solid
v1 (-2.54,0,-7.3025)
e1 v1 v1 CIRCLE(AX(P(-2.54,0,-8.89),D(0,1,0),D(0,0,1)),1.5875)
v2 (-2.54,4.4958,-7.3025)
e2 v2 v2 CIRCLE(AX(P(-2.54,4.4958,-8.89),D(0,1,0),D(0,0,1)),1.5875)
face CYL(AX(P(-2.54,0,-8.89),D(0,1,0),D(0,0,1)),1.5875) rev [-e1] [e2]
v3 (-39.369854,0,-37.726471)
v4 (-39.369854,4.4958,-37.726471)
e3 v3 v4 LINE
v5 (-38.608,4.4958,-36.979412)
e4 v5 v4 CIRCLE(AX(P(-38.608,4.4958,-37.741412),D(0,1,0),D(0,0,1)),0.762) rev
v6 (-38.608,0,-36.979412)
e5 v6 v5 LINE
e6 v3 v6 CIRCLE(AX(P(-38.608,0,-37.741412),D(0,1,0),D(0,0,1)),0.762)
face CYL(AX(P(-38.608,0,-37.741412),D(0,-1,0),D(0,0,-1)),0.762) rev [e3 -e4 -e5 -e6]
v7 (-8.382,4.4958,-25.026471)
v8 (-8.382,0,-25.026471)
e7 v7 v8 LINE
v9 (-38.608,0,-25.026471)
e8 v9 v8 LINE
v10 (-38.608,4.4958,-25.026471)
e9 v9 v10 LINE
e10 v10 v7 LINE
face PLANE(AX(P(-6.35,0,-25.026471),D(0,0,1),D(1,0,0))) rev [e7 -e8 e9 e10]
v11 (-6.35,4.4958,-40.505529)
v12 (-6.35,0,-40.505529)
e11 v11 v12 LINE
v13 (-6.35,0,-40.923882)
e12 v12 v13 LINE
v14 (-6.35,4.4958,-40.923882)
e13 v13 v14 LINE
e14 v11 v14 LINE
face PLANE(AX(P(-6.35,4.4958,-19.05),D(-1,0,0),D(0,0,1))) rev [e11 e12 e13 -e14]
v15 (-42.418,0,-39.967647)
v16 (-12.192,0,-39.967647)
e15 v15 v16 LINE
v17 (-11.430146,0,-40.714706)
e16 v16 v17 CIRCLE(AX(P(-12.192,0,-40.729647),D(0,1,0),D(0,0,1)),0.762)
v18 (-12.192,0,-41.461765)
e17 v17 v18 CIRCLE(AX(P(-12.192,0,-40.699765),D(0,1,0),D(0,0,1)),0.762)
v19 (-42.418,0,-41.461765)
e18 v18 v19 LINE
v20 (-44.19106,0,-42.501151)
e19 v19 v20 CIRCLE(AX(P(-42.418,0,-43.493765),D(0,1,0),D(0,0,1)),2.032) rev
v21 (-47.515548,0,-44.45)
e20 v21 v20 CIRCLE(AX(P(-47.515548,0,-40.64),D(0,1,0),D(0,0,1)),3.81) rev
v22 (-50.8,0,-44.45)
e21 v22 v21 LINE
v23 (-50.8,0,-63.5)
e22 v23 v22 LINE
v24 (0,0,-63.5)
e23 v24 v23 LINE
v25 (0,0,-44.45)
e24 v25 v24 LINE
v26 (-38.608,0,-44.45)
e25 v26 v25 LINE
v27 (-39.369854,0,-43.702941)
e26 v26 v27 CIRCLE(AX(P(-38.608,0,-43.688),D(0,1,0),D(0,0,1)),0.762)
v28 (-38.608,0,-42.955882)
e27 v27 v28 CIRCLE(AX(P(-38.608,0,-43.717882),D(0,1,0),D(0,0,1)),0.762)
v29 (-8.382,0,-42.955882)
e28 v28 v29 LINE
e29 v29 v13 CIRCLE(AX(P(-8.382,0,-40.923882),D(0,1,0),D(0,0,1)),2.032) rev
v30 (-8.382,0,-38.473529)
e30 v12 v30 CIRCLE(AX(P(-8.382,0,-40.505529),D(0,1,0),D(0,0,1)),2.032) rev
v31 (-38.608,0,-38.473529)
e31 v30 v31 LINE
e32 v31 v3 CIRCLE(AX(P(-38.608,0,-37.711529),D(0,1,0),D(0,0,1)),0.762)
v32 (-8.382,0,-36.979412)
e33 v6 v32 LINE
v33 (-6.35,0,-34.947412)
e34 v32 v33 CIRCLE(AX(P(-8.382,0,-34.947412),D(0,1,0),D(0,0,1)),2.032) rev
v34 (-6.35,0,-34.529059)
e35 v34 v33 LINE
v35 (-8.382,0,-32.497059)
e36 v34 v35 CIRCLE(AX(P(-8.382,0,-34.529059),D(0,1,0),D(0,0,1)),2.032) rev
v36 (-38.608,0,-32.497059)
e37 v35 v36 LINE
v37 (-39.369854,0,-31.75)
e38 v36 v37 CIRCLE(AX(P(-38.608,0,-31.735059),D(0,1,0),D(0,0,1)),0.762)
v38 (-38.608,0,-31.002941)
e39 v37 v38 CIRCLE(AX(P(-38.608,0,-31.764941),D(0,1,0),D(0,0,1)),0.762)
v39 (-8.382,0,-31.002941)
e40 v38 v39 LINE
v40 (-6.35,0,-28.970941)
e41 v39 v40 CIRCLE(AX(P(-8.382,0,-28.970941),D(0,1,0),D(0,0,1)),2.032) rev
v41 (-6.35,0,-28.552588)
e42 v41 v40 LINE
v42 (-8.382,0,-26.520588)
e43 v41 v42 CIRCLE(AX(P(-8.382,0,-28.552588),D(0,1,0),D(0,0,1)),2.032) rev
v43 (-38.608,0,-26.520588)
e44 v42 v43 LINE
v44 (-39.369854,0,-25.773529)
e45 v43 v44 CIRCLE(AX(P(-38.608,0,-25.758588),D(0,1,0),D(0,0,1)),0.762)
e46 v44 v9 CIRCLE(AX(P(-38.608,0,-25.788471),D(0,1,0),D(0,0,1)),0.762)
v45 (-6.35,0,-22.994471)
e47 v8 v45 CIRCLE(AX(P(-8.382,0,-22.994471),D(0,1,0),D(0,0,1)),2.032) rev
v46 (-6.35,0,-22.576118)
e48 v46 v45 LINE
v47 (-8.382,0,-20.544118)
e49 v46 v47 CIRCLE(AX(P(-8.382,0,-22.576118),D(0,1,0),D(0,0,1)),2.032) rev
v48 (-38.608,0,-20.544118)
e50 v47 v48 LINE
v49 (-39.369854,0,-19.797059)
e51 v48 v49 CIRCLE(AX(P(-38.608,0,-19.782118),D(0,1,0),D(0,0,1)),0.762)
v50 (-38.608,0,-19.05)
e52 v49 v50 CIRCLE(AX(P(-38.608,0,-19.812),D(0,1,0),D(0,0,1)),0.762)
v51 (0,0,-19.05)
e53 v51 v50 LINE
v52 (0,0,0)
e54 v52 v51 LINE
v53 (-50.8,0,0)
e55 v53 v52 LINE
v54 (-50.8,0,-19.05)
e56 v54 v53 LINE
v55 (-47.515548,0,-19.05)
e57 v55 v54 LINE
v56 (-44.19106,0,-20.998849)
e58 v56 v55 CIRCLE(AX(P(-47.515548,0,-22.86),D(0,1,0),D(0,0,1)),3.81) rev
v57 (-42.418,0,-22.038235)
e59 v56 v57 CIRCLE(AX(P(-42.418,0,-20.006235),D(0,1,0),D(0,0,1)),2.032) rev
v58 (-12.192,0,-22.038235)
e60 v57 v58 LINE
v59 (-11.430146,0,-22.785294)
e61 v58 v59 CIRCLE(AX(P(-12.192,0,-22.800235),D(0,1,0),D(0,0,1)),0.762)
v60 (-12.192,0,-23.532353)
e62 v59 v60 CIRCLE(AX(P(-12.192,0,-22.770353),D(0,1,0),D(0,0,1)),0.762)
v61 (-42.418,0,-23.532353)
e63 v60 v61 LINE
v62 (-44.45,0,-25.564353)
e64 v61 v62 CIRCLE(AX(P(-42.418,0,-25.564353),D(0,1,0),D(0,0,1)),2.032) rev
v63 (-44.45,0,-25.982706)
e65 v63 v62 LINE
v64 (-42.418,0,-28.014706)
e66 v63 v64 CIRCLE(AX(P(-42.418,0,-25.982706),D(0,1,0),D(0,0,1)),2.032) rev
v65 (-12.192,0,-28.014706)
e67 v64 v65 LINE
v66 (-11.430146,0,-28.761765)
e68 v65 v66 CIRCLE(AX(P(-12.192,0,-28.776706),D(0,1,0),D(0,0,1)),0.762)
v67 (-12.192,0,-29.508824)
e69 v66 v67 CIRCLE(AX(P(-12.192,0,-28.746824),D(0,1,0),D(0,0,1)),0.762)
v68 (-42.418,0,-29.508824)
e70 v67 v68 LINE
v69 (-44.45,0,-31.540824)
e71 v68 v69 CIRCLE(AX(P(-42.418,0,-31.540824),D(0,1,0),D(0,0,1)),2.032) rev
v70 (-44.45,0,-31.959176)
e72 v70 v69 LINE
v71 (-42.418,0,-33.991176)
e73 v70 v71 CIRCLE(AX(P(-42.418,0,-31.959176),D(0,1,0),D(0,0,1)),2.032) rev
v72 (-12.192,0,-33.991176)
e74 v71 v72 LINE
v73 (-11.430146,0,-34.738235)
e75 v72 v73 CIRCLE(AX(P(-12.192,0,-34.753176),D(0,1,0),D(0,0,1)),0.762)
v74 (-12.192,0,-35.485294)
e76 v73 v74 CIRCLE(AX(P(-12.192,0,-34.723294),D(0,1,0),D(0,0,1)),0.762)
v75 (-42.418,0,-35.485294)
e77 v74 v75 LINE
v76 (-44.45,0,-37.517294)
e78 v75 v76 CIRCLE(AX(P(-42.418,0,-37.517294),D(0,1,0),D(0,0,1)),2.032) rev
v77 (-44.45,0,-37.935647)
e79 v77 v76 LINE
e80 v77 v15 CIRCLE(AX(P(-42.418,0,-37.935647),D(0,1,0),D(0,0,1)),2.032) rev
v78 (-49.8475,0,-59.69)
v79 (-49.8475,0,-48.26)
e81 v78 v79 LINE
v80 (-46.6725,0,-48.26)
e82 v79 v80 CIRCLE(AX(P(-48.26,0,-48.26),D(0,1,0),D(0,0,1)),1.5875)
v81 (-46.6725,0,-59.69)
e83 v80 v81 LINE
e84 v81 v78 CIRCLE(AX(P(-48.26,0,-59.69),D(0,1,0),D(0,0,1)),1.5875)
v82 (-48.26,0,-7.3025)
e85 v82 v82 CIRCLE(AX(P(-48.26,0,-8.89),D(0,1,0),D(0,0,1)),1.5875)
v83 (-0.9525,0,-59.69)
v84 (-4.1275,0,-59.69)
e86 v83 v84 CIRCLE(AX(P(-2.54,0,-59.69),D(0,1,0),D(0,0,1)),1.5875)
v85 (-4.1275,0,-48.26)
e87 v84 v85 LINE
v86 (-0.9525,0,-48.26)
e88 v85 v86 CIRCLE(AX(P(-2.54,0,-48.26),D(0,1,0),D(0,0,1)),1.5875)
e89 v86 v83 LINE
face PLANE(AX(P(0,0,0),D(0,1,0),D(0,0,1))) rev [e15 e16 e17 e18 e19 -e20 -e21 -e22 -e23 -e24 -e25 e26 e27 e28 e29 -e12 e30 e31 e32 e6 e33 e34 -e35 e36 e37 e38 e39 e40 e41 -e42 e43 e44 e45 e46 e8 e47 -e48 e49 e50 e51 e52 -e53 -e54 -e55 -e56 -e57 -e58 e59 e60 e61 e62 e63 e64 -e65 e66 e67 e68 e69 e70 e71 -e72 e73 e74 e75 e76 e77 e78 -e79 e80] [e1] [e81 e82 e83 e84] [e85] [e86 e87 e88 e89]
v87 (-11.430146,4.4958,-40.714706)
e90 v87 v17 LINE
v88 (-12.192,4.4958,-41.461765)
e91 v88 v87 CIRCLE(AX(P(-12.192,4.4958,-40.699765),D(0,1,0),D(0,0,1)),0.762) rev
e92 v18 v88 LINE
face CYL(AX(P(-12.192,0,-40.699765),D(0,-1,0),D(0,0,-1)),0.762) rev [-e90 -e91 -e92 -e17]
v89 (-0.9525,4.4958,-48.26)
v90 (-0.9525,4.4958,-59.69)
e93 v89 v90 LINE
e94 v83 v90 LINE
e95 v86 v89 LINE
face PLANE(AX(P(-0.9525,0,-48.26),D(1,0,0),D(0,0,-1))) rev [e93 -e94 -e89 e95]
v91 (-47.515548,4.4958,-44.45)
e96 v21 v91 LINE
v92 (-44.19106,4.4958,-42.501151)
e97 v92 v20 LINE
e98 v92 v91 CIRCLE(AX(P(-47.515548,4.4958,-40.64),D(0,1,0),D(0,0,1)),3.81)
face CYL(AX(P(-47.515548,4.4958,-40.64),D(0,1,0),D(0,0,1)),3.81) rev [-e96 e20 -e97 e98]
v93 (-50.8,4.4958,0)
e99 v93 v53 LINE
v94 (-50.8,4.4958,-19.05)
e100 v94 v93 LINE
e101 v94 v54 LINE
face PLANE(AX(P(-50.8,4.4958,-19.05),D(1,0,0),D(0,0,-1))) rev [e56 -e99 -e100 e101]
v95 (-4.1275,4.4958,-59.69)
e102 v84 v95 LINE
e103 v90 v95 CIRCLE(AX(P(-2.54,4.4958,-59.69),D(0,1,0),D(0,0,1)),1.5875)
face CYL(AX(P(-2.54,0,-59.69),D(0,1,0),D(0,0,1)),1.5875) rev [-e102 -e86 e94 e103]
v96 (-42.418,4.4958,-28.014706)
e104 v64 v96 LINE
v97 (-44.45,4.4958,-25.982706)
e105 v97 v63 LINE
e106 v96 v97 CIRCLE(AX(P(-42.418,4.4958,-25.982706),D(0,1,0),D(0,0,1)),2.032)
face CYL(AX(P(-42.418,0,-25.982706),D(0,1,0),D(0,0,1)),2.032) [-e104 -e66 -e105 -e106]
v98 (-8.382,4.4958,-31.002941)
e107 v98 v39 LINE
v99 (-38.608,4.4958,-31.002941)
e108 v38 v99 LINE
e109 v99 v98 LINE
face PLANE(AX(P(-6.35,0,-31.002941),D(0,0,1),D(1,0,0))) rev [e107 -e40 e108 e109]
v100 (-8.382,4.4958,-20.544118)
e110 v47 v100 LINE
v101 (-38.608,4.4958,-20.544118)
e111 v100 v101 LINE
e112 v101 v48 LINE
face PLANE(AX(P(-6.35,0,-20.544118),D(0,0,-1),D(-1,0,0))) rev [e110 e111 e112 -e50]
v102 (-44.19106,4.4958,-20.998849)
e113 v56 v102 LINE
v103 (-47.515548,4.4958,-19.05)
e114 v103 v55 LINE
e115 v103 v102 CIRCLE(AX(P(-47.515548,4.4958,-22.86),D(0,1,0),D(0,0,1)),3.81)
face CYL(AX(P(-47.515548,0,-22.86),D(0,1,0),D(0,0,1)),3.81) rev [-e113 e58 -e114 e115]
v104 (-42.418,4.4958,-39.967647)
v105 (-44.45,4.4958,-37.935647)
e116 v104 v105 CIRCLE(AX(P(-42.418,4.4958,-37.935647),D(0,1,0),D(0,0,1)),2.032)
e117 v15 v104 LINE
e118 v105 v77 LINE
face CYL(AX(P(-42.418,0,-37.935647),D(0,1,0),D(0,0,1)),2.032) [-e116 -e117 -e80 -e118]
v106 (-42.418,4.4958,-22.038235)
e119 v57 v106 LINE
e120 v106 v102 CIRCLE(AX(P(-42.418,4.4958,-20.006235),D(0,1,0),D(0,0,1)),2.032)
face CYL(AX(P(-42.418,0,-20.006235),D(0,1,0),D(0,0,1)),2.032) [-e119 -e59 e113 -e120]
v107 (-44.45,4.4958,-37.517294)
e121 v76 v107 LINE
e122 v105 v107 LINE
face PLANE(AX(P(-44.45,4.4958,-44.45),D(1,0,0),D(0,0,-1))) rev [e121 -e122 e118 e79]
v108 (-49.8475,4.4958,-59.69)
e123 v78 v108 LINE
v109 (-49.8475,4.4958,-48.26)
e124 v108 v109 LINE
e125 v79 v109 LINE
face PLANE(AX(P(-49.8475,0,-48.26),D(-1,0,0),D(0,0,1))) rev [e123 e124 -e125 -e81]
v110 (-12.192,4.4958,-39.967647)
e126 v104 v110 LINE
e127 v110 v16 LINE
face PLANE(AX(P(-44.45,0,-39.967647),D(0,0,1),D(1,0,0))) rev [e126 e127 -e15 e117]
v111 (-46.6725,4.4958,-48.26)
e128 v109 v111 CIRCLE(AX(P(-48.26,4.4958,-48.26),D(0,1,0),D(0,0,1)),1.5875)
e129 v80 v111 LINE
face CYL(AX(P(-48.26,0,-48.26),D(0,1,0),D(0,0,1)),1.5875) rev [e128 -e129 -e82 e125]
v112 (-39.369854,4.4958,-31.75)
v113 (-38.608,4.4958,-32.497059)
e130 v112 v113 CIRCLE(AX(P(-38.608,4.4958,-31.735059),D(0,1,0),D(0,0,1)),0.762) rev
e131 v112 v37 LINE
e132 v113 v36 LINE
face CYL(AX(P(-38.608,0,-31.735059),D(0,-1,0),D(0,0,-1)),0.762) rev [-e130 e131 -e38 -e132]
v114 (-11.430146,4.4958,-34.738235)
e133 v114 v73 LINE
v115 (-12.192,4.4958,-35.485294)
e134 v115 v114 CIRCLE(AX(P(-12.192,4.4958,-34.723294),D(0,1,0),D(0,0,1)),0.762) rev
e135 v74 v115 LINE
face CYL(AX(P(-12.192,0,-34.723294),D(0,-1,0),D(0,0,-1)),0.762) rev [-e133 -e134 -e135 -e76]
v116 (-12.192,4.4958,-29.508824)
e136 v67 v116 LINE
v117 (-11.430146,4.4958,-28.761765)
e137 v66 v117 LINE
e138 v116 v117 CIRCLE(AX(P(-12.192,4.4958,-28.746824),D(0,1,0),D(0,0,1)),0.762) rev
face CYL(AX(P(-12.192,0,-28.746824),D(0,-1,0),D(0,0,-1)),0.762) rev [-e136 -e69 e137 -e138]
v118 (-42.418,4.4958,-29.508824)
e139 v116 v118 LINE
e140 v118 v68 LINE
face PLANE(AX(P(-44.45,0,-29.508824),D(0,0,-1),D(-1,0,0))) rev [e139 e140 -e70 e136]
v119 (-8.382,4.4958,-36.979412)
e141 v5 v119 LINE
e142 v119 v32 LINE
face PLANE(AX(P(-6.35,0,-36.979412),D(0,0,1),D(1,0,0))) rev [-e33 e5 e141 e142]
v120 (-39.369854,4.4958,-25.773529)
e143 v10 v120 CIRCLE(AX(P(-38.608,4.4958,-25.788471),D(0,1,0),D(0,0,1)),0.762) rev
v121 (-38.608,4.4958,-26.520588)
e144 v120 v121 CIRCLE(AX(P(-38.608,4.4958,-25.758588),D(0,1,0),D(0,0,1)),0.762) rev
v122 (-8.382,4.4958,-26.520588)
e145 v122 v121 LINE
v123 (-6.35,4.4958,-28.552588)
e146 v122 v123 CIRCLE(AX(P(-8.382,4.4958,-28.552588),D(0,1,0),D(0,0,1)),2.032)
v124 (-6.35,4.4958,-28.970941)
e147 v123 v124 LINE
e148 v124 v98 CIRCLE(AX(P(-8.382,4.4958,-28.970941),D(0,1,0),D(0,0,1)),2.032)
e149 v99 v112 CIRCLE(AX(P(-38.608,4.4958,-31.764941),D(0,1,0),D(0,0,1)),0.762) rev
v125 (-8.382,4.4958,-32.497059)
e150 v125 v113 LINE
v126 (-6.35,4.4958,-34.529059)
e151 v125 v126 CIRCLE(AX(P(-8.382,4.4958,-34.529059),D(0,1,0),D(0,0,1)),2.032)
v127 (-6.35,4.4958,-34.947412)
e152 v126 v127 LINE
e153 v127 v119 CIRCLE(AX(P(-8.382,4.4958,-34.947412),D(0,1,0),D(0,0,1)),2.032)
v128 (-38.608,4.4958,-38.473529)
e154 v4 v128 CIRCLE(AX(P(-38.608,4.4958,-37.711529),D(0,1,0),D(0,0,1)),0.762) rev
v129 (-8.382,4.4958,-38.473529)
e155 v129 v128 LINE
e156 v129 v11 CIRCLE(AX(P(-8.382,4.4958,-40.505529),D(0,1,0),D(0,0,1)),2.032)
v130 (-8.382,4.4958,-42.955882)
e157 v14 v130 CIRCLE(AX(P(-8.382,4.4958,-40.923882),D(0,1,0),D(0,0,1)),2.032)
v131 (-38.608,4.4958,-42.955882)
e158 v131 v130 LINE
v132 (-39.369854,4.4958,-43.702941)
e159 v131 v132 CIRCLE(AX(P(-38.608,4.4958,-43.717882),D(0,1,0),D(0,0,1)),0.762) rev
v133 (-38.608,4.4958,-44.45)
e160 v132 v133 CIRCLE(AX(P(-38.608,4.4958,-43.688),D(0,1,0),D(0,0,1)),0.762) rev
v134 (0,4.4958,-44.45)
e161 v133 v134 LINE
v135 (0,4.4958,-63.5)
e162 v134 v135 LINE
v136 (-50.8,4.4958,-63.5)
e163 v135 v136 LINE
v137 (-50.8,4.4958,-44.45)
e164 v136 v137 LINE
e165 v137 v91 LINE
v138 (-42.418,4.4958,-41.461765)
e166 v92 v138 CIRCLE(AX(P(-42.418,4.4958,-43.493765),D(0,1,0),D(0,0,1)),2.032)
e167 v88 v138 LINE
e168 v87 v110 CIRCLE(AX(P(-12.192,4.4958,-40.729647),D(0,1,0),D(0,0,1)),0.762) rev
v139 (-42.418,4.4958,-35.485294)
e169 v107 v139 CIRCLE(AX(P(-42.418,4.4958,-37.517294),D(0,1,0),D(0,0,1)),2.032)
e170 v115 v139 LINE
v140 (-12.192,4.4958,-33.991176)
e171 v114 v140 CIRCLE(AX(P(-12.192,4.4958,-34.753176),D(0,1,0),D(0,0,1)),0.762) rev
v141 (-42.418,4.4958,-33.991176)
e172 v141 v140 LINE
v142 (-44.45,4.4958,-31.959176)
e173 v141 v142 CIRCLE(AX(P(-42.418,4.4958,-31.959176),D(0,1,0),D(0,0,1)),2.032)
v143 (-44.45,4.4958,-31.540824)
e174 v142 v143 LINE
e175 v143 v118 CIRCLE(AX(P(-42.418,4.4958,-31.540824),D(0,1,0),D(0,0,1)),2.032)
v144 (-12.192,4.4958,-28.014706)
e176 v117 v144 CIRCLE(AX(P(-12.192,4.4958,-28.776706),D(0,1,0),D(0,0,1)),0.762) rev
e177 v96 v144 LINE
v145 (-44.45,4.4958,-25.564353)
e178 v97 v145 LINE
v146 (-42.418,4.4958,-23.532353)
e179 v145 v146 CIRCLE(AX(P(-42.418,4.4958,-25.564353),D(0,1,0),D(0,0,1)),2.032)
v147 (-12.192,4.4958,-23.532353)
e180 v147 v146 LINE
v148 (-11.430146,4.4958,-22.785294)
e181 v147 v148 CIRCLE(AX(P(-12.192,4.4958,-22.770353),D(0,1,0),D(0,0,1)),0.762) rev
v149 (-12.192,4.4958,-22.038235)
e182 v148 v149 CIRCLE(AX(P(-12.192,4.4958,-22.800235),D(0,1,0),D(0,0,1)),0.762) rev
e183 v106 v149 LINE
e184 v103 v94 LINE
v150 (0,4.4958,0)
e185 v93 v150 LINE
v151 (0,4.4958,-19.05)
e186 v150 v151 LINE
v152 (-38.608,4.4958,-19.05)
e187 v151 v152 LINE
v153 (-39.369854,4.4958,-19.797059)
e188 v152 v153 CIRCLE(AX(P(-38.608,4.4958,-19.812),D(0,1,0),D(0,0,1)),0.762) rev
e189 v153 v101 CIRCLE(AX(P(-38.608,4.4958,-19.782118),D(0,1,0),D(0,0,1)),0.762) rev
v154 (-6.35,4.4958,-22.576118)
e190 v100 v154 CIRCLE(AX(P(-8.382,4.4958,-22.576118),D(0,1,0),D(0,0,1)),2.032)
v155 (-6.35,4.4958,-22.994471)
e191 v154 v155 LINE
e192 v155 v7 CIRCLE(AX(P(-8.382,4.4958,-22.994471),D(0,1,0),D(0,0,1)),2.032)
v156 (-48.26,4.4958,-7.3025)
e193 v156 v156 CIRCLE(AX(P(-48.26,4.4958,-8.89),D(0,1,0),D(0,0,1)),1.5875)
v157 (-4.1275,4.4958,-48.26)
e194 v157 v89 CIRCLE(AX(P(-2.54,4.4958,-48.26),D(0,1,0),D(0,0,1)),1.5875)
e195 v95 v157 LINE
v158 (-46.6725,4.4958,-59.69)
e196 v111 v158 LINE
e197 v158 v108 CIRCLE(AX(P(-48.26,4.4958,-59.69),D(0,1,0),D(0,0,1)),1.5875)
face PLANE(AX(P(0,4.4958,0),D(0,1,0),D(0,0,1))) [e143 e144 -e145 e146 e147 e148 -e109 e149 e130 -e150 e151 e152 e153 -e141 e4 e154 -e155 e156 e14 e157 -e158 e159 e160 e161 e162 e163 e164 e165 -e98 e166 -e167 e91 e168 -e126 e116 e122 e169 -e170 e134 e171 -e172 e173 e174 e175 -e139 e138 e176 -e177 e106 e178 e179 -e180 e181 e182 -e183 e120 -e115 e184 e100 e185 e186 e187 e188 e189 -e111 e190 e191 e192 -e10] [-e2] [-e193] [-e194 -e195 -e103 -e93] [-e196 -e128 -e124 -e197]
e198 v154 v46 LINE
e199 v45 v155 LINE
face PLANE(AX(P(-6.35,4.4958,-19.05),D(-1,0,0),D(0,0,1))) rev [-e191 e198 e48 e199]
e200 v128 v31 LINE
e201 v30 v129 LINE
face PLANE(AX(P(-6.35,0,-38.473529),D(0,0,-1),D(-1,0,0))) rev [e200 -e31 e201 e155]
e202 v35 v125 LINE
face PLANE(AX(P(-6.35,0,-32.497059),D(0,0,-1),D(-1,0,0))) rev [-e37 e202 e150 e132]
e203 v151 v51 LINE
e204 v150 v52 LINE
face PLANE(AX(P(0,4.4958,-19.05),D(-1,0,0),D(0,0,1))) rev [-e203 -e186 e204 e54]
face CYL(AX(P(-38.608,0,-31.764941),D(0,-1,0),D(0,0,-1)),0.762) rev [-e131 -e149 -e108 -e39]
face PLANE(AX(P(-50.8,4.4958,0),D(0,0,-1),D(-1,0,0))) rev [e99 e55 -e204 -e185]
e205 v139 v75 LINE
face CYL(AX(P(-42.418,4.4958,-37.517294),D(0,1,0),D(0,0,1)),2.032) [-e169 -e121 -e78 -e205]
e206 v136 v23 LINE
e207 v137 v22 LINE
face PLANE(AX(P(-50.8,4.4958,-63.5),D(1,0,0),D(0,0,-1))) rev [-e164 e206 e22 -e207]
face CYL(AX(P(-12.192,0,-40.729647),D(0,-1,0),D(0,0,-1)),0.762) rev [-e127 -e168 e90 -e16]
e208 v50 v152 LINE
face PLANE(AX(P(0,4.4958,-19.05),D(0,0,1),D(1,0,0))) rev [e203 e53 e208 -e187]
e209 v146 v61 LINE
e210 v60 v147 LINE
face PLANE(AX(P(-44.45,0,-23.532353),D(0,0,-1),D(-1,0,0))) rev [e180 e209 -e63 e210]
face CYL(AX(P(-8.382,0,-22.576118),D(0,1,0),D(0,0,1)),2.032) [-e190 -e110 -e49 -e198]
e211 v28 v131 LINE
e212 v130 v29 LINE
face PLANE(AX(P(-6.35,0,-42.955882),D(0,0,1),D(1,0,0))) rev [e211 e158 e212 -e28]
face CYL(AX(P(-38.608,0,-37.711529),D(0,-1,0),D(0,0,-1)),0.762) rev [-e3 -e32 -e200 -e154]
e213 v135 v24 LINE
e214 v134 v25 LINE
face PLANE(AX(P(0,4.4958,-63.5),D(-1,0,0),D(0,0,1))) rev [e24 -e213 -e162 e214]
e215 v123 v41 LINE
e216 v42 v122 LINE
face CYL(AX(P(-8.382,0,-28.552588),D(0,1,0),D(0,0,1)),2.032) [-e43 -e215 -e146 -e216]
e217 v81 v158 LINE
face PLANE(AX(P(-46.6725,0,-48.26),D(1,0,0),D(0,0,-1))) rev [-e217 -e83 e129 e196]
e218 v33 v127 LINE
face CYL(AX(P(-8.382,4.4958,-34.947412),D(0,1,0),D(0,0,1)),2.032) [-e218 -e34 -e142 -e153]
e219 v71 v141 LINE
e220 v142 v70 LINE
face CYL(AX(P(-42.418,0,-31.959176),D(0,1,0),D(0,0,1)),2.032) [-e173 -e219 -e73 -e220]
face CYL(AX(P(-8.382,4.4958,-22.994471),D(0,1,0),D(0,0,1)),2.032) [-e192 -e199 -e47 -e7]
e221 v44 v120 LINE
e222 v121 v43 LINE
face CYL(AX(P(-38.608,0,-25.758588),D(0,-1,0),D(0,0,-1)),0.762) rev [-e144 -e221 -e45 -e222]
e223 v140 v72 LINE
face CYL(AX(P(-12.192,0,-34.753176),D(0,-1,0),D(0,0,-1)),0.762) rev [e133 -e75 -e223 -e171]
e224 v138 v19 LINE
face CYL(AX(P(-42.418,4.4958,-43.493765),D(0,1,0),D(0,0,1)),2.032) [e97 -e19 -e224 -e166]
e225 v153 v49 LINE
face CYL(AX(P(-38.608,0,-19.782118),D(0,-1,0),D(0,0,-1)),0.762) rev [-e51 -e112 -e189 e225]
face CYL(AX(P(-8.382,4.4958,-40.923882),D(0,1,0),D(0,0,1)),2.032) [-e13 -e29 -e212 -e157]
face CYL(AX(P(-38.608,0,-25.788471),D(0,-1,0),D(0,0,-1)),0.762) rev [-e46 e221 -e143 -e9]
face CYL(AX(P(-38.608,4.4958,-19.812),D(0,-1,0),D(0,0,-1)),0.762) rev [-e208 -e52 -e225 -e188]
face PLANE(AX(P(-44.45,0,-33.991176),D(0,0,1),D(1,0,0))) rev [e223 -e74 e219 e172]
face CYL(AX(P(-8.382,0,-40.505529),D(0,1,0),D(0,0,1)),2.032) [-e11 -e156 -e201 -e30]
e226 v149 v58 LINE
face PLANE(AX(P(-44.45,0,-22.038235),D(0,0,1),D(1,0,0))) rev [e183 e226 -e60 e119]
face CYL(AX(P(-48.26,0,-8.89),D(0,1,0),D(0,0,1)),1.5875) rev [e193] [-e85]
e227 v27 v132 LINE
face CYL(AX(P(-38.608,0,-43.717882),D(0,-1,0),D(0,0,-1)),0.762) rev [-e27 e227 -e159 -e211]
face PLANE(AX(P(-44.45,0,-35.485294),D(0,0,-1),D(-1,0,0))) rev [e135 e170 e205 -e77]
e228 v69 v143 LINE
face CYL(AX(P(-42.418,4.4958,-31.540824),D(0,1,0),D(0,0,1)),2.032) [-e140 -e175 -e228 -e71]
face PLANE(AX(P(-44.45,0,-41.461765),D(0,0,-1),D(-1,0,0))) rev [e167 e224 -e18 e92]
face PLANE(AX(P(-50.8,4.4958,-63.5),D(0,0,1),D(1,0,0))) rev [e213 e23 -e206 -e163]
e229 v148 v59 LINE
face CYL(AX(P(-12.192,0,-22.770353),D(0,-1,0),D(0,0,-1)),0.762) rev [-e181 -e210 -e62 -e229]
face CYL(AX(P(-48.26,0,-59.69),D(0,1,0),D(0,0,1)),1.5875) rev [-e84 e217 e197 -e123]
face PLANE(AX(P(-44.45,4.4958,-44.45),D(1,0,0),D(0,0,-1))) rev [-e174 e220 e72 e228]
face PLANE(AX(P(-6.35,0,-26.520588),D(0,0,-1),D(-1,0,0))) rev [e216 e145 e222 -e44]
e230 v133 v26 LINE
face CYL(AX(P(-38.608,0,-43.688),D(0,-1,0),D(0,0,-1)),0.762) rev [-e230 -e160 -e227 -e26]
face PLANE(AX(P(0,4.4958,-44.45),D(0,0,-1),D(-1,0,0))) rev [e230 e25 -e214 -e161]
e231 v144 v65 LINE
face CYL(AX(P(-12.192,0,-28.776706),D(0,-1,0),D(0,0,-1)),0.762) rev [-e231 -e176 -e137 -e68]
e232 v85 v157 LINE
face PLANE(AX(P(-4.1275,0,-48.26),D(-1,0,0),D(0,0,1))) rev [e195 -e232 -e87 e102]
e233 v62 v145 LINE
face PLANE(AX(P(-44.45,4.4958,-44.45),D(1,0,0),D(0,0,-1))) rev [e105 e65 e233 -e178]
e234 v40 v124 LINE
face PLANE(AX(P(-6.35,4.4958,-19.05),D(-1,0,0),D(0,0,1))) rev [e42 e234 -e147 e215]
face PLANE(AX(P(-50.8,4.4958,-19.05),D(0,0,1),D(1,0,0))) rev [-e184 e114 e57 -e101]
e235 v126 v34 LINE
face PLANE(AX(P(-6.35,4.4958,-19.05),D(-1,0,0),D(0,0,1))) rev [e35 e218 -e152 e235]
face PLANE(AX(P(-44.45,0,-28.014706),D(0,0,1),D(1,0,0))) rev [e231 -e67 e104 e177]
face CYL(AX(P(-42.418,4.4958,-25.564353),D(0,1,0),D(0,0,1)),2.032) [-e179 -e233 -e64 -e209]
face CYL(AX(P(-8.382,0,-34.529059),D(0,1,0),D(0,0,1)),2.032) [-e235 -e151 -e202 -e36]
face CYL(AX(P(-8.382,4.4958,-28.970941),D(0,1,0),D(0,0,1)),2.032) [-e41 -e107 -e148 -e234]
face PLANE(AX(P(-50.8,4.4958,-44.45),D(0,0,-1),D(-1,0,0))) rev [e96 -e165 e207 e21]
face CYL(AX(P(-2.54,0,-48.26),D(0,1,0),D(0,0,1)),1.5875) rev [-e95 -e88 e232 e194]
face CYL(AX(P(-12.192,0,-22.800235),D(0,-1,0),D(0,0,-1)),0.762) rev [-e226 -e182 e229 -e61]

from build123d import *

# Parameters (mm, degrees)
BOSS_EXTRUDE1_DEPTH     = 4.4958
CUT_EXTRUDE1_DEPTH      = 82.4438593
CUT_EXTRUDE1_DEPTH_BACK = 82.4438593
SKETCH3_R               = 1.5875
CUT_EXTRUDE2_DEPTH      = 82.4438593
CUT_EXTRUDE2_DEPTH_BACK = 82.4438593
SKETCH4_W               = 33.02
SKETCH4_H               = 1.494117647
SKETCH4_H_2             = 1.494117648
FILLET1_R               = 0.762
FILLET2_R               = 2.032
FILLET3_R               = 3.81
FILLET4_R               = 3.81


with BuildPart() as part:
    # Sketch1 → Boss-Extrude1 (new body)
    with BuildSketch(Plane(origin=(0, 0, 0), x_dir=(1, 0, 0), z_dir=(0, 1, 0))):
        Polygon((-50.8, 63.5), (0, 63.5), (0, 44.45), (-6.35, 44.45), (-6.35, 19.05), (0, 19.05), (0, 0), (-50.8, 0), (-50.8, 19.05), (-44.45, 19.05), (-44.45, 44.45), (-50.8, 44.45), align=None)
    extrude(amount=BOSS_EXTRUDE1_DEPTH)

    # Sketch3 → Cut-Extrude1 (cut, two sides: drawn at the far end of the back side and taken through both)
    with BuildSketch(Plane(origin=(0, 4.4958, 0), x_dir=(1, 0, 0), z_dir=(0, 1, 0)).offset(-CUT_EXTRUDE1_DEPTH_BACK)):
        with Locations(Location((-48.26, 8.89, 0), (0, 0, 270))):
            Circle(SKETCH3_R)
        with Locations(Location((-2.54, 8.89, 0), (0, 0, 270))):
            Circle(SKETCH3_R)
        with BuildLine():
            Line((-49.8475, 48.26), (-49.8475, 59.69))
            ThreePointArc((-49.8475, 59.69), (-48.26, 61.2775), (-46.6725, 59.69))
            Line((-46.6725, 59.69), (-46.6725, 48.26))
            ThreePointArc((-46.6725, 48.26), (-48.26, 46.6725), (-49.8475, 48.26))
        make_face()
        with BuildLine():
            Line((-4.1275, 48.26), (-4.1275, 59.69))
            ThreePointArc((-4.1275, 59.69), (-2.54, 61.2775), (-0.9525, 59.69))
            Line((-0.9525, 59.69), (-0.9525, 48.26))
            ThreePointArc((-0.9525, 48.26), (-2.54, 46.6725), (-4.1275, 48.26))
        make_face()
    extrude(amount=CUT_EXTRUDE1_DEPTH + CUT_EXTRUDE1_DEPTH_BACK, mode=Mode.SUBTRACT)

    # Sketch4 → Cut-Extrude2 (cut, two sides: drawn at the far end of the back side and taken through both)
    with BuildSketch(Plane(origin=(0, 4.4958, 0), x_dir=(1, 0, 0), z_dir=(0, 1, 0)).offset(-CUT_EXTRUDE2_DEPTH_BACK)):
        with Locations((-27.94, 34.738235295)):
            Rectangle(SKETCH4_W, SKETCH4_H)
        with Locations((-22.86, 19.797058824)):
            Rectangle(SKETCH4_W, SKETCH4_H)
        with Locations((-27.94, 22.785294118)):
            Rectangle(SKETCH4_W, SKETCH4_H)
        with Locations((-22.86, 25.773529412)):
            Rectangle(SKETCH4_W, SKETCH4_H)
        with Locations((-27.94, 28.761764705)):
            Rectangle(SKETCH4_W, SKETCH4_H)
        with Locations((-22.86, 31.75)):
            Rectangle(SKETCH4_W, SKETCH4_H_2)
        with Locations((-22.86, 37.726470589)):
            Rectangle(SKETCH4_W, SKETCH4_H)
        with Locations((-27.94, 40.714705882)):
            Rectangle(SKETCH4_W, SKETCH4_H)
        with Locations((-22.86, 43.702941177)):
            Rectangle(SKETCH4_W, SKETCH4_H)
    extrude(amount=CUT_EXTRUDE2_DEPTH + CUT_EXTRUDE2_DEPTH_BACK, mode=Mode.SUBTRACT)

    # Fillet1
    # the kernel refuses this fillet: 0.762 mm, written as the material it adds along each edge
    with BuildSketch(Plane(origin=(-39.37, 0, -32.497058824), x_dir=(0, 0, 1), z_dir=(0, 1, 0)), Plane(origin=(-11.43, 0, -29.508823529), x_dir=(-1, 0, 0), z_dir=(0, 1, 0)), Plane(origin=(-11.43, 0, -28.014705882), x_dir=(0, 0, -1), z_dir=(0, 1, 0)), Plane(origin=(-39.37, 0, -31.002941176), x_dir=(1, 0, 0), z_dir=(0, 1, 0)), Plane(origin=(-39.37, 0, -20.544117647), x_dir=(0, 0, 1), z_dir=(0, 1, 0)), Plane(origin=(-39.37, 0, -36.979411765), x_dir=(1, 0, 0), z_dir=(0, 1, 0)), Plane(origin=(-39.37, 0, -42.955882353), x_dir=(1, 0, 0), z_dir=(0, 1, 0)), Plane(origin=(-39.37, 0, -38.473529412), x_dir=(0, 0, 1), z_dir=(0, 1, 0)), Plane(origin=(-39.37, 0, -44.45), x_dir=(0, 0, 1), z_dir=(0, 1, 0)), Plane(origin=(-11.43, 0, -33.991176471), x_dir=(0, 0, -1), z_dir=(0, 1, 0)), Plane(origin=(-11.43, 0, -39.967647059), x_dir=(0, 0, -1), z_dir=(0, 1, 0)), Plane(origin=(-11.43, 0, -35.485294118), x_dir=(-1, 0, 0), z_dir=(0, 1, 0)), Plane(origin=(-11.43, 0, -41.461764706), x_dir=(-1, 0, 0), z_dir=(0, 1, 0))) as fillet1_piece_1:
        with BuildLine():
            CenterArc((FILLET1_R, FILLET1_R), FILLET1_R, 180, 90)
            Line((0, FILLET1_R), (0, 0))
            Line((0, 0), (FILLET1_R, 0))
        make_face()
    extrude(amount=4.4958)
    with BuildSketch(Plane(origin=(-11.43, 4.4958, -22.038235294), x_dir=(0, 0, -1), z_dir=(0, -1, 0)), Plane(origin=(-11.43, 4.4958, -23.532352941), x_dir=(-1, 0, 0), z_dir=(0, -1, 0)), Plane(origin=(-39.37, 4.4958, -25.026470588), x_dir=(1, 0, 0), z_dir=(0, -1, 0)), Plane(origin=(-39.37, 4.4958, -26.520588235), x_dir=(0, 0, 1), z_dir=(0, -1, 0)), Plane(origin=(-39.37, 4.4958, -19.05), x_dir=(1, 0, 0), z_dir=(0, -1, 0))) as fillet1_piece_2:
        with BuildLine():
            CenterArc((FILLET1_R, -FILLET1_R), FILLET1_R, 90, 90)
            Line((0, -FILLET1_R), (0, 0))
            Line((0, 0), (FILLET1_R, 0))
        make_face()
    extrude(amount=4.4958)

    # Fillet2
    fillet2_edges = [part.edges().sort_by_distance(p)[0] for p in [
        (-6.35, 2.2479, -26.520588235),
        (-6.35, 2.2479, -25.026470588),
        (-44.45, 2.2479, -22.038235294),
        (-44.45, 2.2479, -23.532352941),
        (-44.45, 2.2479, -28.014705882),
        (-44.45, 2.2479, -29.508823529),
        (-6.35, 2.2479, -32.497058824),
        (-6.35, 2.2479, -31.002941176),
        (-44.45, 2.2479, -33.991176471),
        (-44.45, 2.2479, -35.485294118),
        (-6.35, 2.2479, -38.473529412),
        (-6.35, 2.2479, -36.979411765),
        (-44.45, 2.2479, -39.967647059),
        (-44.45, 2.2479, -41.461764706),
        (-6.35, 2.2479, -42.955882353),
        (-6.35, 2.2479, -20.544117647),
    ]]
    fillet(fillet2_edges, radius=FILLET2_R)

    # Fillet3
    # the kernel refuses this fillet: 3.81 mm, written as the material it adds along each edge
    with BuildSketch(Plane(origin=(-44.45, 0, -44.45), x_dir=(-1, 0, 0), z_dir=(0, 1, 0))) as fillet3_piece_1:
        with BuildLine():
            CenterArc((3.065547548, 3.81), FILLET3_R, 209.241450743, 60.758549257)
            Line((-0.258939983, 1.948849105), (-0.591388736, 1.762734015))
            ThreePointArc((-0.591388736, 1.762734015), (-0.381, 0.956235294), (-0.381, 0))
            Line((-0.381, 0), (0, -0.381))
            Line((0, -0.381), (3.065547548, -0.381))
            Line((3.065547548, -0.381), (3.065547548, 0))
        make_face()
    extrude(amount=4.4958)

    # Fillet4
    # the kernel refuses this fillet: 3.81 mm, written as the material it adds along each edge
    with BuildSketch(Plane(origin=(-44.45, 0, -19.05), x_dir=(0.1317106342839345, 0, -0.9912882067373362), z_dir=(0, 1, 0))) as fillet4_piece_1:
        with BuildLine():
            CenterArc((3.373042856, 3.540658648), FILLET4_R, 187.568454523, 60.758549257)
            Line((-0.403765212, 3.038841131), (-0.781446019, 2.98865938))
            Line((-0.781446019, 2.98865938), (-0.377680807, -0.050181752))
            Line((-0.377680807, -0.050181752), (0.050181752, -0.377680807))
            ThreePointArc((0.050181752, -0.377680807), (0.998086522, -0.25173445), (1.825269627, -0.354065865))
            Line((1.825269627, -0.354065865), (1.965976284, 0))
        make_face()
    extrude(amount=4.4958)


solid = part.part
